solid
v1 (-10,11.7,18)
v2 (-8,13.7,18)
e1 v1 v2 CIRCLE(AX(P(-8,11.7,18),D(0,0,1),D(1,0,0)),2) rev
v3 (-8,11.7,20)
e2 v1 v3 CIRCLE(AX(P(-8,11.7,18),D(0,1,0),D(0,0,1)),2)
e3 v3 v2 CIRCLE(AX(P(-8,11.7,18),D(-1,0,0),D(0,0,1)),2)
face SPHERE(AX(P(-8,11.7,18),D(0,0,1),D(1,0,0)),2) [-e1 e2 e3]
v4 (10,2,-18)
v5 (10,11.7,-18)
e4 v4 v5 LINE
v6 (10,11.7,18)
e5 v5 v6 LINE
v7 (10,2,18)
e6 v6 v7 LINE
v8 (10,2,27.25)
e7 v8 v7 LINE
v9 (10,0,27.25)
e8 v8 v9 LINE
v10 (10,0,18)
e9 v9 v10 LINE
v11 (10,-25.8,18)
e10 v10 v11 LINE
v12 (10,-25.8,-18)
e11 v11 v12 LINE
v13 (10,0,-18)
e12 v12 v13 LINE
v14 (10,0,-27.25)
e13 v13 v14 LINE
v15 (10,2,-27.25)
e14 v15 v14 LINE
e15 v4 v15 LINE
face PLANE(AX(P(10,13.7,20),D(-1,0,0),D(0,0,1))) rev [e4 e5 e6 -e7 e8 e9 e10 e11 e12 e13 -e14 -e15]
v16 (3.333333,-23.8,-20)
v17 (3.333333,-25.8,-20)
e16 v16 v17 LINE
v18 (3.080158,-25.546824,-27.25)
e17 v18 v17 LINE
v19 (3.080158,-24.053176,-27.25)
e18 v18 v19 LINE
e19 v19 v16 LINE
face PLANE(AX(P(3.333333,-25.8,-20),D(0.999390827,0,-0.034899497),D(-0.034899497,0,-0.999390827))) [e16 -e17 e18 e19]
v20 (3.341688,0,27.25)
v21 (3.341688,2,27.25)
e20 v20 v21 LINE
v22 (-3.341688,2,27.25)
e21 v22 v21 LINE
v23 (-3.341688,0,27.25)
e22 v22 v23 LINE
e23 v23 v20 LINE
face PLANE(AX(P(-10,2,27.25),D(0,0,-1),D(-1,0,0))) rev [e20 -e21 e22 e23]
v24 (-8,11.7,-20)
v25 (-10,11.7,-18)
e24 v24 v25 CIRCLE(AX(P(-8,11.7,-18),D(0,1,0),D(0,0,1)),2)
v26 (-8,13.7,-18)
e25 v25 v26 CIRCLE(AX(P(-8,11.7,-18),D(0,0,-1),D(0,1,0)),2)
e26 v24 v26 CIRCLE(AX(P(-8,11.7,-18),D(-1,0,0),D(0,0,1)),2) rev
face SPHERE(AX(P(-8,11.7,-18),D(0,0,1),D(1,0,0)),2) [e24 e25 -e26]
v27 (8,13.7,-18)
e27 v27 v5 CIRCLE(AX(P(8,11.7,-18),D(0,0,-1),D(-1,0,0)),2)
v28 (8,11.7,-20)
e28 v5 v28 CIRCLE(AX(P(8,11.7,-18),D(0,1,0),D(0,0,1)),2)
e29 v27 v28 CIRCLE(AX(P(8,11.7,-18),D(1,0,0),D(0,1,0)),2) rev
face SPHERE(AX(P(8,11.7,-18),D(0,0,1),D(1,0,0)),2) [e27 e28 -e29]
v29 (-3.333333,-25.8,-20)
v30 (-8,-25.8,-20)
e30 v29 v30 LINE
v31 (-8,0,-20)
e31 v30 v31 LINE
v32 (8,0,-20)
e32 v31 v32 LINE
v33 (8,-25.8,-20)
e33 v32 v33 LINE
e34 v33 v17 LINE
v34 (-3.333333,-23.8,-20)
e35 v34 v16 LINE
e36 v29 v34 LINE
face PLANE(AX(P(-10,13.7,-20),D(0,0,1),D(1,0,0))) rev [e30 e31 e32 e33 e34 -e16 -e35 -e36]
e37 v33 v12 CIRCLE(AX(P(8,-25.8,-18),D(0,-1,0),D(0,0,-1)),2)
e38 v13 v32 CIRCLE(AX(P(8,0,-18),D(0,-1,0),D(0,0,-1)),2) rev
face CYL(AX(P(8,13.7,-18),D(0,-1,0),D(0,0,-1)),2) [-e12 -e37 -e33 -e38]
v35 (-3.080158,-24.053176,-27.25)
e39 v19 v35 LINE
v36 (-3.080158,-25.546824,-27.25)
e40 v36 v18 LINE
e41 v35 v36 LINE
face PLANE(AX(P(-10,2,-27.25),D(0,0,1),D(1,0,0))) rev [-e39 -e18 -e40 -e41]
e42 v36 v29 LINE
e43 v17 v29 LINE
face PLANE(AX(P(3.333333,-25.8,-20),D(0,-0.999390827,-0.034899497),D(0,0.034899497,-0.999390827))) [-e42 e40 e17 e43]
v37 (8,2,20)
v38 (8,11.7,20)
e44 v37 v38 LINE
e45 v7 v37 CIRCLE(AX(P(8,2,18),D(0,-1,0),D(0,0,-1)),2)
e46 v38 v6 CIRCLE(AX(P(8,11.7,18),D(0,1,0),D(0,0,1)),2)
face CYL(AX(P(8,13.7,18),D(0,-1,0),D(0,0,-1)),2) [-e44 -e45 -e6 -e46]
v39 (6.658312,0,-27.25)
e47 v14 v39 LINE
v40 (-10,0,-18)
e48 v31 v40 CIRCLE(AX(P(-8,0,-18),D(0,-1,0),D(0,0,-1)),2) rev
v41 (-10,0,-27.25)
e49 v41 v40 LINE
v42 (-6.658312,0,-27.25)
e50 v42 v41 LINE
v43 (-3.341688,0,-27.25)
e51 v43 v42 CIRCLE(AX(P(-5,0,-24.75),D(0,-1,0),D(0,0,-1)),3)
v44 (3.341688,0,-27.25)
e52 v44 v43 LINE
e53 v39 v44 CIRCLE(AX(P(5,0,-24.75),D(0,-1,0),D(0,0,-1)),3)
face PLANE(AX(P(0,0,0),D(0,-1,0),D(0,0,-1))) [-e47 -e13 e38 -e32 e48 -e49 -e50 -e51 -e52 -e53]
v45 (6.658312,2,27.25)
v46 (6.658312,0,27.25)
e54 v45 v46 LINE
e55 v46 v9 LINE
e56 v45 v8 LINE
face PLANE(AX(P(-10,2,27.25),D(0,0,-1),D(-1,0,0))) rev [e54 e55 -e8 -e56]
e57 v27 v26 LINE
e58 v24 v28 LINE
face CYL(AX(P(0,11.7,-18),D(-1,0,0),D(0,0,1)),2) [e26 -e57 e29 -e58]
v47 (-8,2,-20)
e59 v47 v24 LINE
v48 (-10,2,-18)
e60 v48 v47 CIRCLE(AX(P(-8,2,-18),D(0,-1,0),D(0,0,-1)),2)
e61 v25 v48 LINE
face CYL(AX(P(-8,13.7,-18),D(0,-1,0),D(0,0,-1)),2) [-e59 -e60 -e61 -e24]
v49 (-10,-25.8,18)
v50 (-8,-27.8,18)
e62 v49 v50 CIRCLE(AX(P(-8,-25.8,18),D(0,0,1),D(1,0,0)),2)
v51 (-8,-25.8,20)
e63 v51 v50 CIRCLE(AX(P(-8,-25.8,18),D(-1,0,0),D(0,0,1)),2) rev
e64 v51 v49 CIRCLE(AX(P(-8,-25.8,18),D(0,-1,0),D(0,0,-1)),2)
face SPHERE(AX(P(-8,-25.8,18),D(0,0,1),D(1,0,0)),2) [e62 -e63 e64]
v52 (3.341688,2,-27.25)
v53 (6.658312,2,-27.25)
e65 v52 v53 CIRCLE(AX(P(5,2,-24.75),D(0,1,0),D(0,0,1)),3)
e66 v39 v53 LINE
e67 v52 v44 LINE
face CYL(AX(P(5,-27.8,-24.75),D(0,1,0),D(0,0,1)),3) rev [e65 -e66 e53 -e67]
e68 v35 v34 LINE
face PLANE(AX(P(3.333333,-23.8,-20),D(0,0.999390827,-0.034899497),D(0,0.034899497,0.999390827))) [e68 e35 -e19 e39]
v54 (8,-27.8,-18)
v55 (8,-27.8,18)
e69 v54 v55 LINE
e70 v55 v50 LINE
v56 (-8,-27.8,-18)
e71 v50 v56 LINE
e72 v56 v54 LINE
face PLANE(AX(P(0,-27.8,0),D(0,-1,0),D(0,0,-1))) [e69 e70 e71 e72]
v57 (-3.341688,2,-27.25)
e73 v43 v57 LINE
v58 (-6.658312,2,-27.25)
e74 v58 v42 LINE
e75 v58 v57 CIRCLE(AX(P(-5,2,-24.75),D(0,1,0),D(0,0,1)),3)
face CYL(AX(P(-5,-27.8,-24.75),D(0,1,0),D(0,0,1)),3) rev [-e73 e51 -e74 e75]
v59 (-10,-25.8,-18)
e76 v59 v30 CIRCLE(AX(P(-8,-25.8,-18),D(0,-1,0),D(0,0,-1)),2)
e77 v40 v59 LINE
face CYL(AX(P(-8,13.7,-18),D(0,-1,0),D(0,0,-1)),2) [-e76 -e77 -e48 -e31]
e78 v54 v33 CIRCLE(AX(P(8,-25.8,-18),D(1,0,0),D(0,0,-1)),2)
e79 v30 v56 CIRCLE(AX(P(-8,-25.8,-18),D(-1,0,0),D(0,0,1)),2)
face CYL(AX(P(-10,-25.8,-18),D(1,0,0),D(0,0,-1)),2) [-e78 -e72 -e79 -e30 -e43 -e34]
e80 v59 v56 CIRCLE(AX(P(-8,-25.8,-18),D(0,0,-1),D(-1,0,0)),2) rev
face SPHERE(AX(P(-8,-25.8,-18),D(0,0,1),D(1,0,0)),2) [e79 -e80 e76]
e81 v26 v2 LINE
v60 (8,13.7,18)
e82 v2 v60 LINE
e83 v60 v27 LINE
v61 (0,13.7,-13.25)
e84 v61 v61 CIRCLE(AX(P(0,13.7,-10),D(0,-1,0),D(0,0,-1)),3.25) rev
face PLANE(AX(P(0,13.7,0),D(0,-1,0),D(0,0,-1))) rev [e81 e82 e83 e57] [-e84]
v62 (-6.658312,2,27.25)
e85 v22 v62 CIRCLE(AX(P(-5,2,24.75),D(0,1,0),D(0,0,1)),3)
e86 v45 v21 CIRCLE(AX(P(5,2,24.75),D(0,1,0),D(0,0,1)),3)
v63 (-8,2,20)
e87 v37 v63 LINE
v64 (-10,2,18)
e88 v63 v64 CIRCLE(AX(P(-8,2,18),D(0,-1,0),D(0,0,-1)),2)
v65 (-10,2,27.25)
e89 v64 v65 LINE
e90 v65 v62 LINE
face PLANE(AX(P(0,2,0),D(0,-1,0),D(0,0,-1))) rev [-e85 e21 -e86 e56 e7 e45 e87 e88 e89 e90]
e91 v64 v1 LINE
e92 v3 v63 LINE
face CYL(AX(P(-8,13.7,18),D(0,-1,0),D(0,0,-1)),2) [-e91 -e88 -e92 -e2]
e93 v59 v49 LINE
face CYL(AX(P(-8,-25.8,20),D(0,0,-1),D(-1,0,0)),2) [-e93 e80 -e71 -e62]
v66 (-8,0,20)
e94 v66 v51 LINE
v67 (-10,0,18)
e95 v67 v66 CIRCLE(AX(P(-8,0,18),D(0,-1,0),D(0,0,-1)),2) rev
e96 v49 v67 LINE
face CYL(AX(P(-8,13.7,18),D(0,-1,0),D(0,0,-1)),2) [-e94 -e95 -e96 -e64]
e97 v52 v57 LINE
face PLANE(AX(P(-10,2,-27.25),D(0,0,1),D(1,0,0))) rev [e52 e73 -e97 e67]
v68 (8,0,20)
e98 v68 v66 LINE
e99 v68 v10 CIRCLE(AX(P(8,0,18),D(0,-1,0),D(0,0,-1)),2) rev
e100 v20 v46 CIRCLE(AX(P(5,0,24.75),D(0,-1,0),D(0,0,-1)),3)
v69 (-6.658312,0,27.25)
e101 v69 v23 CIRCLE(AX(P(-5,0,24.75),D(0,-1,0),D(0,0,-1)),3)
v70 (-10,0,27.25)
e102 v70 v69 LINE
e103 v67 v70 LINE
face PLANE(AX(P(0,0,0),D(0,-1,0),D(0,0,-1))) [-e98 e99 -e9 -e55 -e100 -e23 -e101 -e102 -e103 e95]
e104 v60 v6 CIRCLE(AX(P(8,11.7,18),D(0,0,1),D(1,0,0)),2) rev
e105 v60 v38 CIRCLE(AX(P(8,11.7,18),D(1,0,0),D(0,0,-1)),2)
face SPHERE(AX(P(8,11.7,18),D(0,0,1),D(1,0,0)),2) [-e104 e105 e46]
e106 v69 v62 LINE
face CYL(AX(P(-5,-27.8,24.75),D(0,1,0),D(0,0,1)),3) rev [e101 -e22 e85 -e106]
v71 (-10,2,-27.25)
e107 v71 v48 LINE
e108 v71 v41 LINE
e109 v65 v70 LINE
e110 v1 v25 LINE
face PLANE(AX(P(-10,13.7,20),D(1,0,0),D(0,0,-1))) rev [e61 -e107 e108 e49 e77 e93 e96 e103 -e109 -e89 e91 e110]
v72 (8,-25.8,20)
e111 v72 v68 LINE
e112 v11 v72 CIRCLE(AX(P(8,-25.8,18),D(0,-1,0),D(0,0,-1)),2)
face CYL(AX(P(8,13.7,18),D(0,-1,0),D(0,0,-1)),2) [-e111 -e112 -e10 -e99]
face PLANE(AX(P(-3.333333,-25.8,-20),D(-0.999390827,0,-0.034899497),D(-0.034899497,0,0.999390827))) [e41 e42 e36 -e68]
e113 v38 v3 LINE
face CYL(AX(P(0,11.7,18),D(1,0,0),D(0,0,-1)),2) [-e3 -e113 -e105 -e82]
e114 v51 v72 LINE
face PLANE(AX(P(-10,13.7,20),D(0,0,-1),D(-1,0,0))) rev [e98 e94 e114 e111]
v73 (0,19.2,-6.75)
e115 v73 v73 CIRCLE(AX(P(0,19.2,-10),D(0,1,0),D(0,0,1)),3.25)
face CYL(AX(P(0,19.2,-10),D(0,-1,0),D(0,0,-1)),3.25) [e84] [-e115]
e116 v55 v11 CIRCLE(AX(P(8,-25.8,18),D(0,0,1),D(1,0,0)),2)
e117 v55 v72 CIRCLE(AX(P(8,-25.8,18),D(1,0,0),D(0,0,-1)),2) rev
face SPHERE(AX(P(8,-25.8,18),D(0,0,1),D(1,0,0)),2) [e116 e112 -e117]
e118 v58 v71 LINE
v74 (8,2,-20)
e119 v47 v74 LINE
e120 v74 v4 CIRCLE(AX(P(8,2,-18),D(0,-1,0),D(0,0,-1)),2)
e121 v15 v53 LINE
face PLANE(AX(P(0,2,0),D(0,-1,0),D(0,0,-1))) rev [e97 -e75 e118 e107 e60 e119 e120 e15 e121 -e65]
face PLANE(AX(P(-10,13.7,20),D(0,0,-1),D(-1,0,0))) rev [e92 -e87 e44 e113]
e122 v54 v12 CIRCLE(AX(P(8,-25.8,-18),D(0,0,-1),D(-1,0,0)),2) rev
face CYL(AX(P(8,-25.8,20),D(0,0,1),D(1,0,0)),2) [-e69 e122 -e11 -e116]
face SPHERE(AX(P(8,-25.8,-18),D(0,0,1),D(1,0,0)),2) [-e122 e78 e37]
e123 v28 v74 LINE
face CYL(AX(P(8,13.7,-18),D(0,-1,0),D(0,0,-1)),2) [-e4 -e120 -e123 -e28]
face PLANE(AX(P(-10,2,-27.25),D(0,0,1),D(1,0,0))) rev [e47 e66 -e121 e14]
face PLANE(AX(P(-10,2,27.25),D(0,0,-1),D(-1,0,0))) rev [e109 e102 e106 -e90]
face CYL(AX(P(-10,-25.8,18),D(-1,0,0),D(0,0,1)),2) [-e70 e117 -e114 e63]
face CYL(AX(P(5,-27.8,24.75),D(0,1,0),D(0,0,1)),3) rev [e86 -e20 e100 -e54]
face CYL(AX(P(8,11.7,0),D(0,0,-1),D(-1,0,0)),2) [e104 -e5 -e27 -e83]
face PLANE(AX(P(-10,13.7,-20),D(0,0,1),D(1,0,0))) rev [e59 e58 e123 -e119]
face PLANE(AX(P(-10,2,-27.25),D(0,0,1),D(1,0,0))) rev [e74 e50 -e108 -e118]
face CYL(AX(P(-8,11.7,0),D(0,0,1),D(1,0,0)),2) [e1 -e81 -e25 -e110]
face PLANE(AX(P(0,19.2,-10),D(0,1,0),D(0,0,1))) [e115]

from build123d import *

# Parameters (mm, degrees)
BOSS_EXTRUDE1_DEPTH      = 13.7
BOSS_EXTRUDE1_DEPTH_BACK = 27.8
SKETCH1_W                = 20
SKETCH1_H                = 40
SKETCH4_W                = 20
SKETCH4_H                = 54.5
BOSS_EXTRUDE2_DEPTH      = 2
SKETCH5_R                = 3
CUT_EXTRUDE1_DEPTH       = 42.600510814
SKETCH6_R                = 3.25
BOSS_EXTRUDE3_DEPTH      = 5.5
SKETCH7_W                = 6.666666666
SKETCH7_H                = 2
BOSS_EXTRUDE4_DEPTH      = 7.25
BOSS_EXTRUDE4_TAPER      = 2
FILLET1_R                = 2


with BuildPart() as part:
    # Sketch1 → Boss-Extrude1 (new, two sides: drawn at the far end of the back side and taken through both)
    with BuildSketch(Plane(origin=(0, 0, 0), x_dir=(1, 0, 0), z_dir=(0, 1, 0)).offset(-BOSS_EXTRUDE1_DEPTH_BACK)):
        Rectangle(SKETCH1_W, SKETCH1_H)
    extrude(amount=BOSS_EXTRUDE1_DEPTH + BOSS_EXTRUDE1_DEPTH_BACK)

    # Sketch4 → Boss-Extrude2 (add)
    with BuildSketch(Plane(origin=(0, 0, 0), x_dir=(1, 0, 0), z_dir=(0, 1, 0))):
        Rectangle(SKETCH4_W, SKETCH4_H)
    extrude(amount=BOSS_EXTRUDE2_DEPTH)

    # Sketch5 → Cut-Extrude1 (cut, through all)
    with BuildSketch(Plane(origin=(0, 2, 0), x_dir=(1, 0, 0), z_dir=(0, 1, 0))):
        with Locations((-5, 24.75)):
            Circle(SKETCH5_R)
        with Locations((5, 24.75)):
            Circle(SKETCH5_R)
        with Locations((-5, -24.75)):
            Circle(SKETCH5_R)
        with Locations((5, -24.75)):
            Circle(SKETCH5_R)
    extrude(amount=-CUT_EXTRUDE1_DEPTH, mode=Mode.SUBTRACT)

    # Sketch6 → Boss-Extrude3 (add)
    with BuildSketch(Plane(origin=(0, 13.7, 0), x_dir=(1, 0, 0), z_dir=(0, 1, 0))):
        with Locations(Location((0, 10, 0), (0, 0, 90))):
            Circle(SKETCH6_R)
    extrude(amount=BOSS_EXTRUDE3_DEPTH)

    # Sketch7 → Boss-Extrude4 (add)
    with BuildSketch(Plane(origin=(0, 0, -20), x_dir=(-1, 0, 0), z_dir=(0, 0, -1))):
        with Locations((0, -24.8)):
            Rectangle(SKETCH7_W, SKETCH7_H)
    extrude(amount=BOSS_EXTRUDE4_DEPTH, taper=BOSS_EXTRUDE4_TAPER)

    # Fillet1
    fillet1_edges = [part.edges().sort_by_distance(p)[0] for p in [
        (10, -27.8, 0),
        (0, -27.8, 20),
        (-10, -27.8, 0),
        (0, -27.8, -20),
        (-10, 13.7, 0),
        (0, 13.7, 20),
        (-10, -13.9, 20),
        (10, -13.9, 20),
        (-10, -13.9, -20),
        (10, -13.9, -20),
        (10, 13.7, 0),
        (10, 7.85, 20),
        (-10, 7.85, 20),
        (-10, 7.85, -20),
        (10, 7.85, -20),
        (0, 13.7, -20),
    ]]
    fillet(fillet1_edges, radius=FILLET1_R - 0.0001)  # a hair under: the kernel refuses the full size


solid = part.part
